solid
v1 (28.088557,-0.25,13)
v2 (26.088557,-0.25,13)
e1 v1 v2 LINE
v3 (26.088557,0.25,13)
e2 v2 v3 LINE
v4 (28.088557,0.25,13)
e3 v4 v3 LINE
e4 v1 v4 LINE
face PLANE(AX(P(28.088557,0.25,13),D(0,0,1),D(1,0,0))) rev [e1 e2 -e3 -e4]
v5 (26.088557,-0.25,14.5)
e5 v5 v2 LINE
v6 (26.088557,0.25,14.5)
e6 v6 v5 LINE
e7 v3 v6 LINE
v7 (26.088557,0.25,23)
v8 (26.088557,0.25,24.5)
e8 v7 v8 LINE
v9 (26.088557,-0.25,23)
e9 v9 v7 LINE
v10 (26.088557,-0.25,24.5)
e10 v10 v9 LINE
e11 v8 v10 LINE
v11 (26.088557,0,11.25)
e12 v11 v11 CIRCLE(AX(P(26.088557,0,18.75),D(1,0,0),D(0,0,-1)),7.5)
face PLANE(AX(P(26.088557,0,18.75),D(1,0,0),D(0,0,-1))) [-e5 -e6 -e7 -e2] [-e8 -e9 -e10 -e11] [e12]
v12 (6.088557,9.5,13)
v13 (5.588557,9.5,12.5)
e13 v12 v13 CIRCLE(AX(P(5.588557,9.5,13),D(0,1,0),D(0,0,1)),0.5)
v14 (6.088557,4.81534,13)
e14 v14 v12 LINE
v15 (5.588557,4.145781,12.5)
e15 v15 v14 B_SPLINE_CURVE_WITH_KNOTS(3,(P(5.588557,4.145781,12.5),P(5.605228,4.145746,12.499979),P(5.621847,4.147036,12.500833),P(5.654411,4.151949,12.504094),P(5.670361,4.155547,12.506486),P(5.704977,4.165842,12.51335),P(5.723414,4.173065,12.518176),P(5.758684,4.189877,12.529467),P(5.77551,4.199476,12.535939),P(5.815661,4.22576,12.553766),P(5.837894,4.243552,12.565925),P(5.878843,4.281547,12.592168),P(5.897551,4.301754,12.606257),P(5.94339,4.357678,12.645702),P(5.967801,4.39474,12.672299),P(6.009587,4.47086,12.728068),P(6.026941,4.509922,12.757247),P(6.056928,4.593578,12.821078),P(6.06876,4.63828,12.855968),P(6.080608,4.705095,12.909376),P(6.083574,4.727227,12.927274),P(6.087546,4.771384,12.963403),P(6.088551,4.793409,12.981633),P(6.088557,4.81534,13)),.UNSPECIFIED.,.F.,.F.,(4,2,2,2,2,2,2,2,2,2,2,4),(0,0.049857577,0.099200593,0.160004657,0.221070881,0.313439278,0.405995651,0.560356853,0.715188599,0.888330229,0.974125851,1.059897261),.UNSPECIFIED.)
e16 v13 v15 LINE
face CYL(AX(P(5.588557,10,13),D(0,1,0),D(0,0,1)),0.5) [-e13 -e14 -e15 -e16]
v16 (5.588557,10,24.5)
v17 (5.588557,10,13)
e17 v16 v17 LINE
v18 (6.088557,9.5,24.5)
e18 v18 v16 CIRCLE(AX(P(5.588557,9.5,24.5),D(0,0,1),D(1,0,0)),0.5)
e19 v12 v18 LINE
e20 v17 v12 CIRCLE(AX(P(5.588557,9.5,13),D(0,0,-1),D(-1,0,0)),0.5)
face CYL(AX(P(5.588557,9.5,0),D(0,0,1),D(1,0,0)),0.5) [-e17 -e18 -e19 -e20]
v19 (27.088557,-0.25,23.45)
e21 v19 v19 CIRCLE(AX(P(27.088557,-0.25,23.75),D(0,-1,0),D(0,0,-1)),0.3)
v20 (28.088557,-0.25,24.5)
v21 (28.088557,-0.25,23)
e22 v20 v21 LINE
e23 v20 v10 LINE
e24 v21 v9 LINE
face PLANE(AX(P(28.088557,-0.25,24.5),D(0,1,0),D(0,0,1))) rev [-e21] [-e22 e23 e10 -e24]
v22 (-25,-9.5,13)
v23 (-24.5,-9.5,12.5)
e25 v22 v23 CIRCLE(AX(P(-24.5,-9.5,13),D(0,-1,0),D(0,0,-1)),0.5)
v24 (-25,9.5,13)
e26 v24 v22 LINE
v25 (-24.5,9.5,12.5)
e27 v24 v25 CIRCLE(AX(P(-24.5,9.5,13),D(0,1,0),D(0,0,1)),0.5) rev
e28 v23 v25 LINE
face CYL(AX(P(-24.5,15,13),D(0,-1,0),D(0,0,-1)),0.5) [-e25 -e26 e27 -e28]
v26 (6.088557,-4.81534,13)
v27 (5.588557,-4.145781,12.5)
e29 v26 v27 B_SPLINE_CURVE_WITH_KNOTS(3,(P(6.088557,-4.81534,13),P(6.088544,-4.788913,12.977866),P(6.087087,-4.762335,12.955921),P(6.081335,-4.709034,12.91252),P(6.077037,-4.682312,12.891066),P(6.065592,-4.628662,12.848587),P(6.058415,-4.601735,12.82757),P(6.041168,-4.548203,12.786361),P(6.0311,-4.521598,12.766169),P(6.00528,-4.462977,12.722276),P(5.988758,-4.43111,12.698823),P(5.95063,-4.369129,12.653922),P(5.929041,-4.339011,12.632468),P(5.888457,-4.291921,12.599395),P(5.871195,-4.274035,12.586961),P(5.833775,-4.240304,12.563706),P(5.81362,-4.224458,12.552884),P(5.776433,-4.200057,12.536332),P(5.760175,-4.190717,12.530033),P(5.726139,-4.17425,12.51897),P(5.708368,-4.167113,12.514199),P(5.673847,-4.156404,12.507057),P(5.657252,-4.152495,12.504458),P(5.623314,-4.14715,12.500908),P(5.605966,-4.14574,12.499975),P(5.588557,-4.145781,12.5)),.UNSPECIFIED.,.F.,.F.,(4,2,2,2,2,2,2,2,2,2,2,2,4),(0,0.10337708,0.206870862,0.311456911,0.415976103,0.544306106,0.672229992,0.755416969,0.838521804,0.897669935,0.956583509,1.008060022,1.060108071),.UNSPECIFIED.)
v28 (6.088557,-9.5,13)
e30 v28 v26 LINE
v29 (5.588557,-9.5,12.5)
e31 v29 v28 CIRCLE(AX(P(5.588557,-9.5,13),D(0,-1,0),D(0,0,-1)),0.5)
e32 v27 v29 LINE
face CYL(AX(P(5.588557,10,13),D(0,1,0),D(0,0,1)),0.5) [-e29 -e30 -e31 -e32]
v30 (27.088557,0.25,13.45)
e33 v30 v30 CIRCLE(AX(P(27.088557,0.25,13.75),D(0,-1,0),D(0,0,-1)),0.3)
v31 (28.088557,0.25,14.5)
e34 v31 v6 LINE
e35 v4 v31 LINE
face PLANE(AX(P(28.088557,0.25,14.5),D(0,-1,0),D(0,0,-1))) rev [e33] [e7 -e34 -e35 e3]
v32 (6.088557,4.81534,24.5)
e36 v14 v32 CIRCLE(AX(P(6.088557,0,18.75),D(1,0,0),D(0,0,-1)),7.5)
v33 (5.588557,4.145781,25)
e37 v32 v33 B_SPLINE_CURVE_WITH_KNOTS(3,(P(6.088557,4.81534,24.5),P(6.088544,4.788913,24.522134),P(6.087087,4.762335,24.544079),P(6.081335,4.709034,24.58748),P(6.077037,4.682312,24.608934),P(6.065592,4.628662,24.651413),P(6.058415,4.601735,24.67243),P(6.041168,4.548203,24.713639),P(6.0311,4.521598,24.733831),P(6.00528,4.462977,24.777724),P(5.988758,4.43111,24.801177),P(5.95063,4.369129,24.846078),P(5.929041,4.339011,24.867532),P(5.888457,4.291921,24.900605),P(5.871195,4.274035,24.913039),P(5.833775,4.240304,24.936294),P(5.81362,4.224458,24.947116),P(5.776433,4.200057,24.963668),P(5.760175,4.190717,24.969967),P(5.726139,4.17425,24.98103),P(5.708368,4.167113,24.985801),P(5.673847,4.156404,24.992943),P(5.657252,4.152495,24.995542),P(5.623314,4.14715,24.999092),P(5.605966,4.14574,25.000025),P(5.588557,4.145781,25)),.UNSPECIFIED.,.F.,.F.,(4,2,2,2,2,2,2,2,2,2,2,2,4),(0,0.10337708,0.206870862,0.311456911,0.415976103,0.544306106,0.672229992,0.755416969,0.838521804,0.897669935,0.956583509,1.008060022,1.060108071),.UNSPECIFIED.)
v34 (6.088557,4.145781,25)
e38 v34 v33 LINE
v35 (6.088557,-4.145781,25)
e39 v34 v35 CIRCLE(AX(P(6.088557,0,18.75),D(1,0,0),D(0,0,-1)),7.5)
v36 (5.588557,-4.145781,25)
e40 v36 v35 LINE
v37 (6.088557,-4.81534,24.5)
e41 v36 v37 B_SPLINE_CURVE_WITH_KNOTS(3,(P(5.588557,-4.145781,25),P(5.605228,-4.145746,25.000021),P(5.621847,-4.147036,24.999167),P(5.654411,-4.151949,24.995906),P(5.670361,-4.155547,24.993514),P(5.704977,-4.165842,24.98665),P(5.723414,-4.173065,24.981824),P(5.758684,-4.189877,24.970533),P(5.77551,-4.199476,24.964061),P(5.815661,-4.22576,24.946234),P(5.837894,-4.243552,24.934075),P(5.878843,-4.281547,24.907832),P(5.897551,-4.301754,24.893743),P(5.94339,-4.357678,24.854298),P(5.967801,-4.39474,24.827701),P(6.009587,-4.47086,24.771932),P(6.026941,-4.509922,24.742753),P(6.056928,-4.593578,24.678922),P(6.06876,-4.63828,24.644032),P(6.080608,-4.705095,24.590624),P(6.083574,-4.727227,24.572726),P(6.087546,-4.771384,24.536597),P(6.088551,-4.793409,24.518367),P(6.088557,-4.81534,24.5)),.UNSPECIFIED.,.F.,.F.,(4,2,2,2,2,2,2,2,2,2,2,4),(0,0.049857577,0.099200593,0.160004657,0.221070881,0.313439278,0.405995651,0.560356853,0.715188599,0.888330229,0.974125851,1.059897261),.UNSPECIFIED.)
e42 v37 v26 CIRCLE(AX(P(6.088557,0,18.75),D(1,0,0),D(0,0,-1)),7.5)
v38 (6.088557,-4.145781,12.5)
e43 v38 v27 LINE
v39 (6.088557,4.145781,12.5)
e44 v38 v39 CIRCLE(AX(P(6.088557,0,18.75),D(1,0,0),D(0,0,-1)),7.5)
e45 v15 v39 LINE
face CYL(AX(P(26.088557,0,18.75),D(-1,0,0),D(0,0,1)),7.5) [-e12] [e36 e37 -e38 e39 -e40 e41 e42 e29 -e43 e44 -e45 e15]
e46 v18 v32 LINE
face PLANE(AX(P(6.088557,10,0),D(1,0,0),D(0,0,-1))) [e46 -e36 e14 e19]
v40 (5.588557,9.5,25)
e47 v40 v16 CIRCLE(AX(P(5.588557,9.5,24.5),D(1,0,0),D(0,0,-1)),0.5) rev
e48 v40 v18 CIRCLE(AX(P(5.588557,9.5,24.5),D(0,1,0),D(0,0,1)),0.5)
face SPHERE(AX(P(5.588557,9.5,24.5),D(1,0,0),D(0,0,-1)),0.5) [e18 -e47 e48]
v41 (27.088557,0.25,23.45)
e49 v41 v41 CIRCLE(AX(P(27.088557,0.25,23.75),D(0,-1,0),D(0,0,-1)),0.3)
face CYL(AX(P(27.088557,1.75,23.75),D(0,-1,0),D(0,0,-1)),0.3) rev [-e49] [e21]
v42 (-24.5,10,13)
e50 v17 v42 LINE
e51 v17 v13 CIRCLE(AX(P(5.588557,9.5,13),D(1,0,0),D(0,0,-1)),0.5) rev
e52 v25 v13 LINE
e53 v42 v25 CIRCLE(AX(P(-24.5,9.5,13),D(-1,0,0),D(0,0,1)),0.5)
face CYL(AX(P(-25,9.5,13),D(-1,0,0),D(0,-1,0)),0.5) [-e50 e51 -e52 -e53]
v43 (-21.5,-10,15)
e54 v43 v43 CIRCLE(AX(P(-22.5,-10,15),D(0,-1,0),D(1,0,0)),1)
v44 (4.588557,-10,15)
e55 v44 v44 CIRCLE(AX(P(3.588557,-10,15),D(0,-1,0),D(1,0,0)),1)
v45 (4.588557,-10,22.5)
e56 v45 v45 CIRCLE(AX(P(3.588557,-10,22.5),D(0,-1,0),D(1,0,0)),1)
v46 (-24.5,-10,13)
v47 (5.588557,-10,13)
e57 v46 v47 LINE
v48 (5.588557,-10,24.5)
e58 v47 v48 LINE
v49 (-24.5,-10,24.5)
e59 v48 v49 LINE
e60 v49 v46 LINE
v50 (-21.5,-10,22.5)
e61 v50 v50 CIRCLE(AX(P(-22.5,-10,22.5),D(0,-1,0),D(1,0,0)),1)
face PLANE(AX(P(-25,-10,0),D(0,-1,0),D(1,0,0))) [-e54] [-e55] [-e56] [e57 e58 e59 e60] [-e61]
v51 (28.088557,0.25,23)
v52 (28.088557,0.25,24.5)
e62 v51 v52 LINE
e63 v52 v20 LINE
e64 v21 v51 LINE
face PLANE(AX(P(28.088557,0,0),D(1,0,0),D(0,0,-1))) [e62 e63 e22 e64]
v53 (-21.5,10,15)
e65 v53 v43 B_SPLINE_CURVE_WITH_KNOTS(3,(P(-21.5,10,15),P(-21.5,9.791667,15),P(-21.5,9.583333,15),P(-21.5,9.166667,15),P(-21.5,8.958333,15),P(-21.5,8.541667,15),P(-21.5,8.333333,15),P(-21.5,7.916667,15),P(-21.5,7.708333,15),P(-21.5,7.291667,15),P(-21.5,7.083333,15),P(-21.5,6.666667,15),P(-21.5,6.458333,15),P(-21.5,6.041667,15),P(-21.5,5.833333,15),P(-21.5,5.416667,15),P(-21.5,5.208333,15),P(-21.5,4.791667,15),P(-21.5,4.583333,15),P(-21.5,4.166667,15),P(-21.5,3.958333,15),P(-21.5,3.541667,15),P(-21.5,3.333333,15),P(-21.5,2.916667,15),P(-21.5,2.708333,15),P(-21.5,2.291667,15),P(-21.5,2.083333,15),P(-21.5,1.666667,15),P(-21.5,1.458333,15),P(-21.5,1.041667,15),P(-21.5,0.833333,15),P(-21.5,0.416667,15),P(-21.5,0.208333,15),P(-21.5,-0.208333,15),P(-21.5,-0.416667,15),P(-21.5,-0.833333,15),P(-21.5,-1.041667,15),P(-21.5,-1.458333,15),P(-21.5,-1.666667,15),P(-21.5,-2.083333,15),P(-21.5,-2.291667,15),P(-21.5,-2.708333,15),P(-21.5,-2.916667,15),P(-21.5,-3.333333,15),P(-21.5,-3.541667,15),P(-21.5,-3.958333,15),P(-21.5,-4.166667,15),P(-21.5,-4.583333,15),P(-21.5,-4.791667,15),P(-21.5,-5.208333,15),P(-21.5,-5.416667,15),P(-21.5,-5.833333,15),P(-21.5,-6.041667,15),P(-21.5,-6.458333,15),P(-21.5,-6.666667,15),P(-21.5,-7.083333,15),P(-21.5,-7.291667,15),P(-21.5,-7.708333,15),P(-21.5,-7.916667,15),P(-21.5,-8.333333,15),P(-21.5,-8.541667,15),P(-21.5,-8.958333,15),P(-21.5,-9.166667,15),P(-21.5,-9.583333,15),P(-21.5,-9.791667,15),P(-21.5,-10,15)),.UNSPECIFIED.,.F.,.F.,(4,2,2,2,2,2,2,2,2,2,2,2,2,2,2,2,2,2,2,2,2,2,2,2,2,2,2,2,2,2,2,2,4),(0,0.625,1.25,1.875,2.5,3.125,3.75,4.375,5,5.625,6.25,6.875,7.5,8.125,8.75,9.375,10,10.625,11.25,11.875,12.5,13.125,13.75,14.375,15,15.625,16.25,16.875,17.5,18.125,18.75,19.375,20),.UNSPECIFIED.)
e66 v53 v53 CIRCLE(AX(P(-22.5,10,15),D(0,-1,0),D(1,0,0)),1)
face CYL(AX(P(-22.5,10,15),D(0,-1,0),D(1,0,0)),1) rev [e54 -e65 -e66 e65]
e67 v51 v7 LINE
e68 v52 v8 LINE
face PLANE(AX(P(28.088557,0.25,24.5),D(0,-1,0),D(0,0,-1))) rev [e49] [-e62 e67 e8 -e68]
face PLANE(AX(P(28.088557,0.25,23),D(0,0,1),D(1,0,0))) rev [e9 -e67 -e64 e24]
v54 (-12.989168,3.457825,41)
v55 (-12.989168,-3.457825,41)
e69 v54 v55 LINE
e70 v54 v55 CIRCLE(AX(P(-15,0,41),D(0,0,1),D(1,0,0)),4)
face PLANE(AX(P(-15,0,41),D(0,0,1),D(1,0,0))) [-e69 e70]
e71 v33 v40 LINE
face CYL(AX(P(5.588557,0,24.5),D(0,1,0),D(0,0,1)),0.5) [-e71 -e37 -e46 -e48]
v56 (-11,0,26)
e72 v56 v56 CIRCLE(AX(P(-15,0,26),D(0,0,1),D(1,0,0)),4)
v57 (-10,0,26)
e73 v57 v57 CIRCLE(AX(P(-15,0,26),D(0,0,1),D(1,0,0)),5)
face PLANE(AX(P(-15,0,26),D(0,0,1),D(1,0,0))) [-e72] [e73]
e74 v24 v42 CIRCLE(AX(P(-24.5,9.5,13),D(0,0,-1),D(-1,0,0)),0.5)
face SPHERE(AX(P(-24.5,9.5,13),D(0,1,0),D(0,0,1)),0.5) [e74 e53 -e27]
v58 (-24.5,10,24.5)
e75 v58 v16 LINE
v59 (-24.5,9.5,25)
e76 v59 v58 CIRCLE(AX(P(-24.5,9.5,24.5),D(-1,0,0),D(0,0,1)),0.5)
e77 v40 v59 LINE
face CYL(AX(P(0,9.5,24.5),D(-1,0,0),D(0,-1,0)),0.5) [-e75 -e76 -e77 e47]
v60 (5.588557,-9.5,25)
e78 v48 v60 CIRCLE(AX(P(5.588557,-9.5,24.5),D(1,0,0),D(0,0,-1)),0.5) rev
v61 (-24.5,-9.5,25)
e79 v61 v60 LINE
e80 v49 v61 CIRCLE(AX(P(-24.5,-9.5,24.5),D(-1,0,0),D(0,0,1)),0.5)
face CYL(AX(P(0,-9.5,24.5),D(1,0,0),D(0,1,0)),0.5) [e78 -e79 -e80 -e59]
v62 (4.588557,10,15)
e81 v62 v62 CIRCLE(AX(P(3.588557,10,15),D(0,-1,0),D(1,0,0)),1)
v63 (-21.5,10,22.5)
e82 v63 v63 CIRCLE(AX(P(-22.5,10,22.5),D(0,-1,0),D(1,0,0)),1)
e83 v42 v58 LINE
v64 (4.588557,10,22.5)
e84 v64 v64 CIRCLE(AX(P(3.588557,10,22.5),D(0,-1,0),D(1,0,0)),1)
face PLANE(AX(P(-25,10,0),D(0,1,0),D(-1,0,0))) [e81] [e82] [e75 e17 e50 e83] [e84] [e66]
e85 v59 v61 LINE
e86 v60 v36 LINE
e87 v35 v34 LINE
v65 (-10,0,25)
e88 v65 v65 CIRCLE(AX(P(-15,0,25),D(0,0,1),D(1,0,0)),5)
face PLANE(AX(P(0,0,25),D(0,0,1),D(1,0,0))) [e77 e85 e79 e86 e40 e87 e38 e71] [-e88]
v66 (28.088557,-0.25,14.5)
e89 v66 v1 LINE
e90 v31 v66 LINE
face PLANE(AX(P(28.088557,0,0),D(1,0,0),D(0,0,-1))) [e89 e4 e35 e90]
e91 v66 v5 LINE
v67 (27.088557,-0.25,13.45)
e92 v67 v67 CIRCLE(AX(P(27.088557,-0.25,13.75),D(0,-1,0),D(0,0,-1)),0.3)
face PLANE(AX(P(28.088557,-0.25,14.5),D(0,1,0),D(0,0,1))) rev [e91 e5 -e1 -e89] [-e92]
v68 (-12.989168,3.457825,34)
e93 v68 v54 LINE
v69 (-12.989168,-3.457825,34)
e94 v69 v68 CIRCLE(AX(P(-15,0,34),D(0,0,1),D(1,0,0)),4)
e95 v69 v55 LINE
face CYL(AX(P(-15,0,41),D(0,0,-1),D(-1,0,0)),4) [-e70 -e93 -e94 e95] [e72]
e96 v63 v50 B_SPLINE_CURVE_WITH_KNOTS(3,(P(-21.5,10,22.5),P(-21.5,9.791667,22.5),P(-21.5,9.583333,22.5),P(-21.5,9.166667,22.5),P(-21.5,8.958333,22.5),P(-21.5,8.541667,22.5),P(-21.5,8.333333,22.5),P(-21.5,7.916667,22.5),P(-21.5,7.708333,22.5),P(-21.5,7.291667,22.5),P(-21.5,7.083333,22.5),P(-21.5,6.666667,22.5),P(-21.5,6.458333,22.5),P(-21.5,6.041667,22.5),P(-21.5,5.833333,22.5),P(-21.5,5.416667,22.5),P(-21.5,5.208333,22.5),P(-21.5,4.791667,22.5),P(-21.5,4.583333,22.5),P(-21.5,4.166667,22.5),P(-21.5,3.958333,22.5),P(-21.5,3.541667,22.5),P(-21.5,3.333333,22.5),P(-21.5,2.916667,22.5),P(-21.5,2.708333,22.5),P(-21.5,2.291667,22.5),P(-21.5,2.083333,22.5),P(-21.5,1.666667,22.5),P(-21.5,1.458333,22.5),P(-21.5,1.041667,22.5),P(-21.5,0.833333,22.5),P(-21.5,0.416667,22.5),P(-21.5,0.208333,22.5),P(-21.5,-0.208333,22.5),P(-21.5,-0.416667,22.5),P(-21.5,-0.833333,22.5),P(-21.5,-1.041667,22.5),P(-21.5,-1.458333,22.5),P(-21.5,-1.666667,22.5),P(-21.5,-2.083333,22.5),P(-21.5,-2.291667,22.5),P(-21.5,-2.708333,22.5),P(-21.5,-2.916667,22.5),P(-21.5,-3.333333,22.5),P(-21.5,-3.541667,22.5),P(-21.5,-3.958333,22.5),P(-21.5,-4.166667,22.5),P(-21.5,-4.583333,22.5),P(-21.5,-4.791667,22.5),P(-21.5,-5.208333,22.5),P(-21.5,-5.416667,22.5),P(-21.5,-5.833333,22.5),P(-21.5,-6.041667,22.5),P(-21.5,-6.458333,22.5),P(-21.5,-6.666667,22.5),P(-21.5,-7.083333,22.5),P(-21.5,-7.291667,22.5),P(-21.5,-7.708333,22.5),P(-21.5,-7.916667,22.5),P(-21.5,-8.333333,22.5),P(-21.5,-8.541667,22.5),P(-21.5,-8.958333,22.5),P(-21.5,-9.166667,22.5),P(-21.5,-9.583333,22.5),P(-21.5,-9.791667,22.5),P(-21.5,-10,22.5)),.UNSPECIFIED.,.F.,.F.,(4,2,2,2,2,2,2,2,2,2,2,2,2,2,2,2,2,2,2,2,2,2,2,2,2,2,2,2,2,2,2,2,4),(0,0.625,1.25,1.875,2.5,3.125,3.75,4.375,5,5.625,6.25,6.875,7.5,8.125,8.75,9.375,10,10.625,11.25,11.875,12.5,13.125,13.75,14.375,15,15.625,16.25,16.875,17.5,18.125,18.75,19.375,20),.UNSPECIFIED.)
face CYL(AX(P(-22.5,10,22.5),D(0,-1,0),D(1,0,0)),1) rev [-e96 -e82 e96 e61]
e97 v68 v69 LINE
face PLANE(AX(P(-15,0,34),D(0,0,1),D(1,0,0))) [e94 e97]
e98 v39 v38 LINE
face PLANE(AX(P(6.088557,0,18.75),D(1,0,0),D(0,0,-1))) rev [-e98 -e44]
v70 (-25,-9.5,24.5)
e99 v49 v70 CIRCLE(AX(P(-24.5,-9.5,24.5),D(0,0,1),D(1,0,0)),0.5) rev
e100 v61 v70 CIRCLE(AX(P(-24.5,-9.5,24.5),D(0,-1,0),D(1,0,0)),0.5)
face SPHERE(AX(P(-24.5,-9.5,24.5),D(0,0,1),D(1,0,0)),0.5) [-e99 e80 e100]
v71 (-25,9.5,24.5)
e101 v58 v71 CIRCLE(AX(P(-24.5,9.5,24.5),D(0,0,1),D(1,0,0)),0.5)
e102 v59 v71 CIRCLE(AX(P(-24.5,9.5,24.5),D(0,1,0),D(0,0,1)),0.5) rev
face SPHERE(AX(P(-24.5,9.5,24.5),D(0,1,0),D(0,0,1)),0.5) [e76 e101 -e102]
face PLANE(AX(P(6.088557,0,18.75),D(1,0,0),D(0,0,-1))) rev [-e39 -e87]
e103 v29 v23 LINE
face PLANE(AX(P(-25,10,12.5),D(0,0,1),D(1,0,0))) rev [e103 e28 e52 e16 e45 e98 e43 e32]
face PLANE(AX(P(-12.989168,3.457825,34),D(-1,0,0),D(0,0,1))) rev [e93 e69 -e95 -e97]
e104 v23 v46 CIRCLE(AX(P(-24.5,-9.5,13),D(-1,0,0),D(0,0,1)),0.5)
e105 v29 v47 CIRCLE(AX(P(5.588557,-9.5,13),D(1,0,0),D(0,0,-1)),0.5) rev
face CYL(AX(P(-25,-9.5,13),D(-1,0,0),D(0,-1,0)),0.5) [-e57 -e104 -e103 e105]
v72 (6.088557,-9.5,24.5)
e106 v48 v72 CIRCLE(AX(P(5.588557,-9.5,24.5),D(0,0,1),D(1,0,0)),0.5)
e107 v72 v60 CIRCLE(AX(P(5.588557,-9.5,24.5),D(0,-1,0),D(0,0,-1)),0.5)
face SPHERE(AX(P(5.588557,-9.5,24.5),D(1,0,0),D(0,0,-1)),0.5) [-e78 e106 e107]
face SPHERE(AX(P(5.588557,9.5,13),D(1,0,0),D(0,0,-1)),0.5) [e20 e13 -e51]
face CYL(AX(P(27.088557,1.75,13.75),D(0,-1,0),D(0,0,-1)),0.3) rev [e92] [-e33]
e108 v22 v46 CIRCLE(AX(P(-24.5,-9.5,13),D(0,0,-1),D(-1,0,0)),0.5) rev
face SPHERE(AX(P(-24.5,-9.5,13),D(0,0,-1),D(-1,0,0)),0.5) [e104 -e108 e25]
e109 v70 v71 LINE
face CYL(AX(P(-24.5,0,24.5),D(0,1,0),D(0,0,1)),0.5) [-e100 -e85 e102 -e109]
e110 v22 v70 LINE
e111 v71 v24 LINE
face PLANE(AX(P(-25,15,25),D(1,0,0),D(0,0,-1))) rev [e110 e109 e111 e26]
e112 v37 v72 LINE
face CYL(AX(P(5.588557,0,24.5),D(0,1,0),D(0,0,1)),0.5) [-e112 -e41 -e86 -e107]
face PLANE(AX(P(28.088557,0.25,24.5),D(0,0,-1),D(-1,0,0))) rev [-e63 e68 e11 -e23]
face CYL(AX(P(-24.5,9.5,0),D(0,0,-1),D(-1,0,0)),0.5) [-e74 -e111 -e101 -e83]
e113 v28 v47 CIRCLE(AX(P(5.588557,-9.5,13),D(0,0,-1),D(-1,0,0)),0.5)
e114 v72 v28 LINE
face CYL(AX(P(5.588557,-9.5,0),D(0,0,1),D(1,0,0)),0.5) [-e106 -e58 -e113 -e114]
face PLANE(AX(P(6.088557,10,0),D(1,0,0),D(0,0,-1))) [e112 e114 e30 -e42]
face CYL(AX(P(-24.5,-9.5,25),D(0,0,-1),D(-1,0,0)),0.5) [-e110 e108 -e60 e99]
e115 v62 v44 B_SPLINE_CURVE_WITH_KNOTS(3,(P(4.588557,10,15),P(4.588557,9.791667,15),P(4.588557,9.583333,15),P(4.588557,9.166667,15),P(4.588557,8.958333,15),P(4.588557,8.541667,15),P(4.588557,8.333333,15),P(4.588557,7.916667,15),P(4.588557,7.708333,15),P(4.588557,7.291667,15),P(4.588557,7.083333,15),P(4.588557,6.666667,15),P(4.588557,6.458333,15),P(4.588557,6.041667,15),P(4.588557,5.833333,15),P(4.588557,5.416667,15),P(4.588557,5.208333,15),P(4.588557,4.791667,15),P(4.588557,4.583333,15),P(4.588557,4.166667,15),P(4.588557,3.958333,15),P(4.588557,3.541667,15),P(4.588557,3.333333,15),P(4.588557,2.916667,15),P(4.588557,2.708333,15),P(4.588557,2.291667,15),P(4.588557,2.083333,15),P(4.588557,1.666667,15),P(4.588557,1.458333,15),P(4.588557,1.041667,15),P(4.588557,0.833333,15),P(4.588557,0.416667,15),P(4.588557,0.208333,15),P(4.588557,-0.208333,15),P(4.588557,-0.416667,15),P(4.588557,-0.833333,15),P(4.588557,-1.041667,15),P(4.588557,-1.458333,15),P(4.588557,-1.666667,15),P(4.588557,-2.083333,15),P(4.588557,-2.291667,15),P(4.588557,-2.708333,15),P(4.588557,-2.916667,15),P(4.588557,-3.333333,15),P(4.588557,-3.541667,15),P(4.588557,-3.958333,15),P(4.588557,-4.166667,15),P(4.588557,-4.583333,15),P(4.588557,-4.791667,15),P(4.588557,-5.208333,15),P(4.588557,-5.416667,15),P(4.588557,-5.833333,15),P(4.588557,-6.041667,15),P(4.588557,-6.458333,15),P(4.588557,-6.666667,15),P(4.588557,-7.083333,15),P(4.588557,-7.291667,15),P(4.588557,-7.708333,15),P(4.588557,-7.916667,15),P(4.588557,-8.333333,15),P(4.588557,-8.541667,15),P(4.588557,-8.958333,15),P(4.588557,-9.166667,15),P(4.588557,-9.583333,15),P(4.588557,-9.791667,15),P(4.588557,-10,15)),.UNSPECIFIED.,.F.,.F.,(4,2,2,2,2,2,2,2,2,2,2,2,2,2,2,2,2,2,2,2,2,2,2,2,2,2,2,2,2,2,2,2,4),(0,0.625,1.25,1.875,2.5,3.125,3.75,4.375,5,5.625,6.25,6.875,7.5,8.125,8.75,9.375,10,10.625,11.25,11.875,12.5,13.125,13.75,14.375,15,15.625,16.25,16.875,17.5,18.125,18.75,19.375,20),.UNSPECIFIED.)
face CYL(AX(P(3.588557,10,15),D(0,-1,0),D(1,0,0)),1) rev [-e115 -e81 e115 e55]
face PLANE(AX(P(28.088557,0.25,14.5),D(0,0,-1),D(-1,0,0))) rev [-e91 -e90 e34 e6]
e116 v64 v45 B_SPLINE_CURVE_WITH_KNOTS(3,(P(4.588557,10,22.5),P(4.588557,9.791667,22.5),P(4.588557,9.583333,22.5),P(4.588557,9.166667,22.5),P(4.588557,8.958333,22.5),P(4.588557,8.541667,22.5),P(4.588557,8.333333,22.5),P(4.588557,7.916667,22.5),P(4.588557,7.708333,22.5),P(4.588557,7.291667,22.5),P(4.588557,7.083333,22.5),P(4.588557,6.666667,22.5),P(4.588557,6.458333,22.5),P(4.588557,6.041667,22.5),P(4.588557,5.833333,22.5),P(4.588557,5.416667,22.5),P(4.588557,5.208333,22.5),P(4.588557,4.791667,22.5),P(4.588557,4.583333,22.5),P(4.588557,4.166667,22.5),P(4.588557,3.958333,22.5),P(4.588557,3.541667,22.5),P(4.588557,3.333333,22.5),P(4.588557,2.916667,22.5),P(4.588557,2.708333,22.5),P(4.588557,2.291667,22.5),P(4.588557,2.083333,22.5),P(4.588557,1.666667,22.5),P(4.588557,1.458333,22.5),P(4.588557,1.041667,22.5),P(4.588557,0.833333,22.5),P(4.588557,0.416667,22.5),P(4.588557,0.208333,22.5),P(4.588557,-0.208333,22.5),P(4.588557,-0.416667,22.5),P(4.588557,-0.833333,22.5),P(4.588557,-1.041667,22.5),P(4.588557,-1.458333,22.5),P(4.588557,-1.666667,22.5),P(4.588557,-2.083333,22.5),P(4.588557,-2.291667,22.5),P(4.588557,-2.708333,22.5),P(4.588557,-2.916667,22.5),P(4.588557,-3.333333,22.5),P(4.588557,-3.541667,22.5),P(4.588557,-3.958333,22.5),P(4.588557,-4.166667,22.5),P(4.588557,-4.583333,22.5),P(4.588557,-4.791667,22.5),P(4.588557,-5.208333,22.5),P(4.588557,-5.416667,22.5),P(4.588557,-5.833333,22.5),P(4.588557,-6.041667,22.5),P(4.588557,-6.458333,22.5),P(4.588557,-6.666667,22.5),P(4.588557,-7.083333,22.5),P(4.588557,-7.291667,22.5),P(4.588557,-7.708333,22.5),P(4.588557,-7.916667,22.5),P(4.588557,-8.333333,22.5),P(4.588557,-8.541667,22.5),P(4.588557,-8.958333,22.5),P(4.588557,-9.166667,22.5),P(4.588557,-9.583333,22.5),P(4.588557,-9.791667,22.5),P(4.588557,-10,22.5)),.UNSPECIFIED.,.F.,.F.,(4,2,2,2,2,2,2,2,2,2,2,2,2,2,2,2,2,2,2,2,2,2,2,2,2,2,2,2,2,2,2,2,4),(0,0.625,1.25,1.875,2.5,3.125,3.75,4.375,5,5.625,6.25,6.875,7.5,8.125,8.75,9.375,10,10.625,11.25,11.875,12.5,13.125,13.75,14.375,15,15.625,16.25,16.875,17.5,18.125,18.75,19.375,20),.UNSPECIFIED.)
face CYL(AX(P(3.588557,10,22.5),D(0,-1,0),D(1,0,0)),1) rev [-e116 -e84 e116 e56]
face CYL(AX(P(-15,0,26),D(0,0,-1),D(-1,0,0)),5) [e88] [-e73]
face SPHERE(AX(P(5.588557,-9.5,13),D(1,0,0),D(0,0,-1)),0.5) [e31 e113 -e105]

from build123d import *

# Parameters (mm, degrees)
SKETCH_1_W          = 50
SKETCH_1_H          = 30
EXTRUDE_1_DEPTH     = 25
SKETCH_2_R          = 5
EXTRUDE_2_DEPTH     = 1
SKETCH_3_R          = 4
EXTRUDE_3_DEPTH     = 15
SKETCH_6_W          = 125.650571392
SKETCH_6_H          = 76.942116616
SKETCH_6_W_2        = 31.088556847
SKETCH_6_H_2        = 20
CUT_EXTRUDE_1_DEPTH = 39.405728739
SKETCH_7_W          = 12.5
SKETCH_7_H          = 20
CUT_EXTRUDE_2_DEPTH = 53.416584845
SKETCH_8_R          = 7.5
EXTRUDE_5_DEPTH     = 20
SKETCH_9_W          = 1.5
SKETCH_9_H          = 0.5
EXTRUDE_6_DEPTH     = 2
SKETCH_10_R         = 0.3
CUT_EXTRUDE_3_DEPTH = 2
FILLET_1_R          = 0.5
CUT_EXTRUDE_START   = -7
CUT_EXTRUDE_4_DEPTH = 7
SKETCH_12_R         = 1
CUT_EXTRUDE_5_DEPTH = 54.572073189


with BuildPart() as part:
    # 草图1 → 凸台-拉伸1 (new body)
    with BuildSketch(Plane.XY):
        Rectangle(SKETCH_1_W, SKETCH_1_H)
    extrude(amount=EXTRUDE_1_DEPTH)

    # 草图2 → 凸台-拉伸2 (add)
    with BuildSketch(Plane.XY.offset(25)):
        with Locations((-15, 0)):
            Circle(SKETCH_2_R)
    extrude(amount=EXTRUDE_2_DEPTH)

    # 草图3 → 凸台-拉伸3 (add)
    with BuildSketch(Plane.XY.offset(26)):
        with Locations((-15, 0)):
            Circle(SKETCH_3_R)
    extrude(amount=EXTRUDE_3_DEPTH)

    # 草图6 → 切除-拉伸1 (cut, through all)
    with BuildSketch(Plane.XY.offset(25)):
        with Locations((-32.975192835, 18.238730024)):
            Rectangle(SKETCH_6_W, SKETCH_6_H)
        with Locations((-9.455721577, 0)):
            Rectangle(SKETCH_6_W_2, SKETCH_6_H_2, mode=Mode.SUBTRACT)
    extrude(amount=-CUT_EXTRUDE_1_DEPTH, mode=Mode.SUBTRACT)

    # 草图7 → 切除-拉伸2 (cut, through all)
    with BuildSketch(Plane(origin=(6.088556847, 0, 0), x_dir=(0, 0, -1), z_dir=(1, 0, 0))):
        with Locations((-6.25, 0)):
            Rectangle(SKETCH_7_W, SKETCH_7_H)
    extrude(amount=-CUT_EXTRUDE_2_DEPTH, mode=Mode.SUBTRACT)

    # 草图8 → 凸台-拉伸5 (add)
    with BuildSketch(Plane(origin=(6.088556847, 0, 0), x_dir=(0, 0, -1), z_dir=(1, 0, 0))):
        with Locations(Location((-18.75, 0, 0), (0, 0, 146.442690238))):
            Circle(SKETCH_8_R)
    extrude(amount=EXTRUDE_5_DEPTH)

    # 草图9 → 凸台-拉伸6 (add)
    with BuildSketch(Plane(origin=(26.088556847, 0, 0), x_dir=(0, 0, -1), z_dir=(1, 0, 0))):
        with Locations((-23.75, 0)):
            Rectangle(SKETCH_9_W, SKETCH_9_H)
        with Locations((-13.75, 0)):
            Rectangle(SKETCH_9_W, SKETCH_9_H)
    extrude(amount=EXTRUDE_6_DEPTH)

    # 草图10 → 切除-拉伸3 (cut)
    with BuildSketch(Plane.XZ.offset(0.25)):
        with Locations(Location((27.088556847, 23.75, 0), (0, 0, 270))):
            Circle(SKETCH_10_R)
        with Locations(Location((27.088556847, 13.75, 0), (0, 0, 270))):
            Circle(SKETCH_10_R)
    extrude(amount=-CUT_EXTRUDE_3_DEPTH, mode=Mode.SUBTRACT)

    # 圆角1
    # the kernel refuses this fillet: 0.5 mm, written as the material it takes off along each edge
    with BuildSketch(Plane(origin=(-24.5, -9.5, 24.5), x_dir=(0, 0, 1), z_dir=(-1, 0, 0))) as fillet_1_piece_1_section:
        Polygon((0, 0), (FILLET_1_R * 1.02, 0), (FILLET_1_R * 1.02, -FILLET_1_R * 1.02), (0, -FILLET_1_R * 1.02), align=None)
    fillet_1_piece_1 = extrude(amount=FILLET_1_R * 1.02, mode=Mode.PRIVATE)
    fillet_1_piece_1 = fillet_1_piece_1 - Plane(origin=(-24.5, -9.5, 24.5), x_dir=(0, 0.7071067811865475, -0.7071067811865475), z_dir=(-1, 0, 0)) * Sphere(FILLET_1_R, mode=Mode.PRIVATE)
    add(fillet_1_piece_1, mode=Mode.SUBTRACT)
    with BuildSketch(Plane(origin=(-24.5, 9.5, 24.5), x_dir=(0, 1, 0), z_dir=(-1, 0, 0))) as fillet_1_piece_2_section:
        Polygon((0, 0), (FILLET_1_R * 1.02, 0), (FILLET_1_R * 1.02, -FILLET_1_R * 1.02), (0, -FILLET_1_R * 1.02), align=None)
    fillet_1_piece_2 = extrude(amount=FILLET_1_R * 1.02, mode=Mode.PRIVATE)
    fillet_1_piece_2 = fillet_1_piece_2 - Plane(origin=(-24.5, 9.5, 24.5), x_dir=(0, -0.7071067811865475, -0.7071067811865475), z_dir=(-1, 0, 0)) * Sphere(FILLET_1_R, mode=Mode.PRIVATE)
    add(fillet_1_piece_2, mode=Mode.SUBTRACT)
    with BuildSketch(Plane(origin=(5.588556847, 9.5, 24.5), x_dir=(0, 0, 1), z_dir=(0, 1, 0))) as fillet_1_piece_3_section:
        Polygon((0, 0), (FILLET_1_R * 1.02, 0), (FILLET_1_R * 1.02, FILLET_1_R * 1.02), (0, FILLET_1_R * 1.02), align=None)
    fillet_1_piece_3 = extrude(amount=FILLET_1_R * 1.02, mode=Mode.PRIVATE)
    fillet_1_piece_3 = fillet_1_piece_3 - Plane(origin=(5.588556847, 9.5, 24.5), x_dir=(-0.7071067811865475, 0, -0.7071067811865475), z_dir=(0, 1, 0)) * Sphere(FILLET_1_R, mode=Mode.PRIVATE)
    add(fillet_1_piece_3, mode=Mode.SUBTRACT)
    with BuildSketch(Plane(origin=(5.588556847, -9.5, 24.5), x_dir=(0, -1, 0), z_dir=(0, 0, 1))) as fillet_1_piece_4_section:
        Polygon((0, 0), (FILLET_1_R * 1.02, 0), (FILLET_1_R * 1.02, FILLET_1_R * 1.02), (0, FILLET_1_R * 1.02), align=None)
    fillet_1_piece_4 = extrude(amount=FILLET_1_R * 1.02, mode=Mode.PRIVATE)
    fillet_1_piece_4 = fillet_1_piece_4 - Plane(origin=(5.588556847, -9.5, 24.5), x_dir=(-0.7071067811865475, 0.7071067811865476, 0), z_dir=(0, 0, 1)) * Sphere(FILLET_1_R, mode=Mode.PRIVATE)
    add(fillet_1_piece_4, mode=Mode.SUBTRACT)
    with BuildSketch(Plane(origin=(-24.5, -9.5, 13), x_dir=(0, 0, -1), z_dir=(-1, 0, 0))) as fillet_1_piece_5_section:
        Polygon((0, 0), (FILLET_1_R * 1.02, 0), (FILLET_1_R * 1.02, FILLET_1_R * 1.02), (0, FILLET_1_R * 1.02), align=None)
    fillet_1_piece_5 = extrude(amount=FILLET_1_R * 1.02, mode=Mode.PRIVATE)
    fillet_1_piece_5 = fillet_1_piece_5 - Plane(origin=(-24.5, -9.5, 13), x_dir=(0, 0.7071067811865475, 0.7071067811865475), z_dir=(-1, 0, 0)) * Sphere(FILLET_1_R, mode=Mode.PRIVATE)
    add(fillet_1_piece_5, mode=Mode.SUBTRACT)
    with BuildSketch(Plane(origin=(5.588556847, -9.5, 13), x_dir=(0, -1, 0), z_dir=(0, 0, -1))) as fillet_1_piece_6_section:
        Polygon((0, 0), (FILLET_1_R * 1.02, 0), (FILLET_1_R * 1.02, -FILLET_1_R * 1.02), (0, -FILLET_1_R * 1.02), align=None)
    fillet_1_piece_6 = extrude(amount=FILLET_1_R * 1.02, mode=Mode.PRIVATE)
    fillet_1_piece_6 = fillet_1_piece_6 - Plane(origin=(5.588556847, -9.5, 13), x_dir=(-0.7071067811865475, 0.7071067811865476, 0), z_dir=(0, 0, -1)) * Sphere(FILLET_1_R, mode=Mode.PRIVATE)
    add(fillet_1_piece_6, mode=Mode.SUBTRACT)
    with BuildSketch(Plane(origin=(5.588556847, 9.5, 13), x_dir=(0, 1, 0), z_dir=(0, 0, -1))) as fillet_1_piece_7_section:
        Polygon((0, 0), (FILLET_1_R * 1.02, 0), (FILLET_1_R * 1.02, FILLET_1_R * 1.02), (0, FILLET_1_R * 1.02), align=None)
    fillet_1_piece_7 = extrude(amount=FILLET_1_R * 1.02, mode=Mode.PRIVATE)
    fillet_1_piece_7 = fillet_1_piece_7 - Plane(origin=(5.588556847, 9.5, 13), x_dir=(-0.7071067811865475, -0.7071067811865476, 0), z_dir=(0, 0, -1)) * Sphere(FILLET_1_R, mode=Mode.PRIVATE)
    add(fillet_1_piece_7, mode=Mode.SUBTRACT)
    with BuildSketch(Plane(origin=(-24.5, 9.5, 13), x_dir=(0, 0, -1), z_dir=(-1, 0, 0))) as fillet_1_piece_8_section:
        Polygon((0, 0), (FILLET_1_R * 1.02, 0), (FILLET_1_R * 1.02, -FILLET_1_R * 1.02), (0, -FILLET_1_R * 1.02), align=None)
    fillet_1_piece_8 = extrude(amount=FILLET_1_R * 1.02, mode=Mode.PRIVATE)
    fillet_1_piece_8 = fillet_1_piece_8 - Plane(origin=(-24.5, 9.5, 13), x_dir=(0, -0.7071067811865475, 0.7071067811865475), z_dir=(-1, 0, 0)) * Sphere(FILLET_1_R, mode=Mode.PRIVATE)
    add(fillet_1_piece_8, mode=Mode.SUBTRACT)
    with BuildSketch(Plane(origin=(-25, -9.5, 25), x_dir=(0, 0, -1), z_dir=(0, 1, 0)), Plane(origin=(-25, 9.5, 12.5), x_dir=(0, 0, 1), z_dir=(0, -1, 0))) as fillet_1_piece_9:
        with BuildLine():
            CenterArc((FILLET_1_R, -FILLET_1_R), FILLET_1_R, 90, 90)
            Line((0, -FILLET_1_R), (0, 0))
            Line((0, 0), (FILLET_1_R, 0))
        make_face()
    extrude(amount=19, mode=Mode.SUBTRACT)
    with BuildSketch(Plane(origin=(-24.5, 10, 25), x_dir=(0, 0, -1), z_dir=(1, 0, 0)), Plane(origin=(5.588556847, -10, 12.5), x_dir=(0, 1, 0), z_dir=(-1, 0, 0))) as fillet_1_piece_10:
        with BuildLine():
            CenterArc((FILLET_1_R, -FILLET_1_R), FILLET_1_R, 90, 90)
            Line((0, -FILLET_1_R), (0, 0))
            Line((0, 0), (FILLET_1_R, 0))
        make_face()
    extrude(amount=30.088556847, mode=Mode.SUBTRACT)
    with BuildSketch(Plane(origin=(6.088556847, -2.895780988, 25), x_dir=(-1, 0, 0), z_dir=(0, -1, 0))) as fillet_1_piece_11_section:
        with BuildLine():
            CenterArc((FILLET_1_R, FILLET_1_R), FILLET_1_R, 180, 90)
            Line((0, FILLET_1_R), (0, 0))
            Line((0, 0), (FILLET_1_R, 0))
        make_face()
    fillet_1_piece_11 = extrude(amount=6.604219012, mode=Mode.PRIVATE)
    fillet_1_piece_11 = fillet_1_piece_11 - Plane(origin=(5.975472157, 0, 18.75), x_dir=(0, 0.5527707983937196, 0.8333333333325685), z_dir=(-1, 0, 0)) * Cylinder(7.5, 16, mode=Mode.PRIVATE)
    add(fillet_1_piece_11, mode=Mode.SUBTRACT)
    with BuildSketch(Plane(origin=(5.588556847, -10, 25), x_dir=(0, 1, 0), z_dir=(-1, 0, 0)), Plane(origin=(5.588556847, 10, 12.5), x_dir=(0, -1, 0), z_dir=(-1, 0, 0))) as fillet_1_piece_12:
        with BuildLine():
            CenterArc((FILLET_1_R, FILLET_1_R), FILLET_1_R, 180, 90)
            Line((0, FILLET_1_R), (0, 0))
            Line((0, 0), (FILLET_1_R, 0))
        make_face()
    extrude(amount=30.088556847, mode=Mode.SUBTRACT)
    with BuildSketch(Plane(origin=(-25, -10, 24.5), x_dir=(0, 1, 0), z_dir=(0, 0, -1)), Plane(origin=(6.088556847, -10, 24.5), x_dir=(-1, 0, 0), z_dir=(0, 0, -1))) as fillet_1_piece_13:
        with BuildLine():
            CenterArc((FILLET_1_R, FILLET_1_R), FILLET_1_R, 180, 90)
            Line((0, FILLET_1_R), (0, 0))
            Line((0, 0), (FILLET_1_R, 0))
        make_face()
    extrude(amount=11.5, mode=Mode.SUBTRACT)
    with BuildSketch(Plane(origin=(6.088556847, 10, 24.5), x_dir=(-1, 0, 0), z_dir=(0, 0, -1)), Plane(origin=(-25, 10, 24.5), x_dir=(0, -1, 0), z_dir=(0, 0, -1))) as fillet_1_piece_14:
        with BuildLine():
            CenterArc((FILLET_1_R, -FILLET_1_R), FILLET_1_R, 90, 90)
            Line((0, -FILLET_1_R), (0, 0))
            Line((0, 0), (FILLET_1_R, 0))
        make_face()
    extrude(amount=11.5, mode=Mode.SUBTRACT)
    with BuildSketch(Plane(origin=(6.088556847, 2.895780988, 12.5), x_dir=(-1, 0, 0), z_dir=(0, 1, 0))) as fillet_1_piece_15_section:
        with BuildLine():
            CenterArc((FILLET_1_R, FILLET_1_R), FILLET_1_R, 180, 90)
            Line((0, FILLET_1_R), (0, 0))
            Line((0, 0), (FILLET_1_R, 0))
        make_face()
    fillet_1_piece_15 = extrude(amount=6.604219012, mode=Mode.PRIVATE)
    fillet_1_piece_15 = fillet_1_piece_15 - Plane(origin=(5.975472139, 0, 18.75), x_dir=(0, 0.5527707983937196, 0.8333333333325685), z_dir=(-1, 0, 0)) * Cylinder(7.5, 16, mode=Mode.PRIVATE)
    add(fillet_1_piece_15, mode=Mode.SUBTRACT)
    with BuildSketch(Plane(origin=(6.088556847, -9.5, 12.5), x_dir=(-1, 0, 0), z_dir=(0, 1, 0))) as fillet_1_piece_16_section:
        with BuildLine():
            CenterArc((FILLET_1_R, FILLET_1_R), FILLET_1_R, 180, 90)
            Line((0, FILLET_1_R), (0, 0))
            Line((0, 0), (FILLET_1_R, 0))
        make_face()
    fillet_1_piece_16 = extrude(amount=6.604219012, mode=Mode.PRIVATE)
    fillet_1_piece_16 = fillet_1_piece_16 - Plane(origin=(5.97547253, 0, 18.75), x_dir=(0, 0.5527707983937196, 0.8333333333325685), z_dir=(-1, 0, 0)) * Cylinder(7.5, 16, mode=Mode.PRIVATE)
    add(fillet_1_piece_16, mode=Mode.SUBTRACT)
    with BuildSketch(Plane(origin=(6.088556847, 9.5, 25), x_dir=(-1, 0, 0), z_dir=(0, -1, 0))) as fillet_1_piece_17_section:
        with BuildLine():
            CenterArc((FILLET_1_R, FILLET_1_R), FILLET_1_R, 180, 90)
            Line((0, FILLET_1_R), (0, 0))
            Line((0, 0), (FILLET_1_R, 0))
        make_face()
    fillet_1_piece_17 = extrude(amount=6.604219012, mode=Mode.PRIVATE)
    fillet_1_piece_17 = fillet_1_piece_17 - Plane(origin=(5.975472488, 0, 18.75), x_dir=(0, 0.5527707983937196, 0.8333333333325685), z_dir=(-1, 0, 0)) * Cylinder(7.5, 16, mode=Mode.PRIVATE)
    add(fillet_1_piece_17, mode=Mode.SUBTRACT)

    # 草图11 → 切除-拉伸4 (cut)
    with BuildSketch(Plane.XY.offset(41).offset(CUT_EXTRUDE_START)):
        with BuildLine():
            Line((-12.989168341, 3.457825334), (-12.989168341, -3.457825334))
            ThreePointArc((-12.989168341, -3.457825334), (-11, 0), (-12.989168341, 3.457825334))
        make_face()
    extrude(amount=CUT_EXTRUDE_4_DEPTH, mode=Mode.SUBTRACT)

    # 草图12 → 切除-拉伸5 (cut, through all)
    with BuildSketch(Plane.XZ.offset(10)):
        with Locations((-22.5, 22.5)):
            Circle(SKETCH_12_R)
        with Locations((3.588556847, 22.5)):
            Circle(SKETCH_12_R)
        with Locations((-22.5, 15)):
            Circle(SKETCH_12_R)
        with Locations((3.588556847, 15)):
            Circle(SKETCH_12_R)
    extrude(amount=-CUT_EXTRUDE_5_DEPTH, mode=Mode.SUBTRACT)


solid = part.part
